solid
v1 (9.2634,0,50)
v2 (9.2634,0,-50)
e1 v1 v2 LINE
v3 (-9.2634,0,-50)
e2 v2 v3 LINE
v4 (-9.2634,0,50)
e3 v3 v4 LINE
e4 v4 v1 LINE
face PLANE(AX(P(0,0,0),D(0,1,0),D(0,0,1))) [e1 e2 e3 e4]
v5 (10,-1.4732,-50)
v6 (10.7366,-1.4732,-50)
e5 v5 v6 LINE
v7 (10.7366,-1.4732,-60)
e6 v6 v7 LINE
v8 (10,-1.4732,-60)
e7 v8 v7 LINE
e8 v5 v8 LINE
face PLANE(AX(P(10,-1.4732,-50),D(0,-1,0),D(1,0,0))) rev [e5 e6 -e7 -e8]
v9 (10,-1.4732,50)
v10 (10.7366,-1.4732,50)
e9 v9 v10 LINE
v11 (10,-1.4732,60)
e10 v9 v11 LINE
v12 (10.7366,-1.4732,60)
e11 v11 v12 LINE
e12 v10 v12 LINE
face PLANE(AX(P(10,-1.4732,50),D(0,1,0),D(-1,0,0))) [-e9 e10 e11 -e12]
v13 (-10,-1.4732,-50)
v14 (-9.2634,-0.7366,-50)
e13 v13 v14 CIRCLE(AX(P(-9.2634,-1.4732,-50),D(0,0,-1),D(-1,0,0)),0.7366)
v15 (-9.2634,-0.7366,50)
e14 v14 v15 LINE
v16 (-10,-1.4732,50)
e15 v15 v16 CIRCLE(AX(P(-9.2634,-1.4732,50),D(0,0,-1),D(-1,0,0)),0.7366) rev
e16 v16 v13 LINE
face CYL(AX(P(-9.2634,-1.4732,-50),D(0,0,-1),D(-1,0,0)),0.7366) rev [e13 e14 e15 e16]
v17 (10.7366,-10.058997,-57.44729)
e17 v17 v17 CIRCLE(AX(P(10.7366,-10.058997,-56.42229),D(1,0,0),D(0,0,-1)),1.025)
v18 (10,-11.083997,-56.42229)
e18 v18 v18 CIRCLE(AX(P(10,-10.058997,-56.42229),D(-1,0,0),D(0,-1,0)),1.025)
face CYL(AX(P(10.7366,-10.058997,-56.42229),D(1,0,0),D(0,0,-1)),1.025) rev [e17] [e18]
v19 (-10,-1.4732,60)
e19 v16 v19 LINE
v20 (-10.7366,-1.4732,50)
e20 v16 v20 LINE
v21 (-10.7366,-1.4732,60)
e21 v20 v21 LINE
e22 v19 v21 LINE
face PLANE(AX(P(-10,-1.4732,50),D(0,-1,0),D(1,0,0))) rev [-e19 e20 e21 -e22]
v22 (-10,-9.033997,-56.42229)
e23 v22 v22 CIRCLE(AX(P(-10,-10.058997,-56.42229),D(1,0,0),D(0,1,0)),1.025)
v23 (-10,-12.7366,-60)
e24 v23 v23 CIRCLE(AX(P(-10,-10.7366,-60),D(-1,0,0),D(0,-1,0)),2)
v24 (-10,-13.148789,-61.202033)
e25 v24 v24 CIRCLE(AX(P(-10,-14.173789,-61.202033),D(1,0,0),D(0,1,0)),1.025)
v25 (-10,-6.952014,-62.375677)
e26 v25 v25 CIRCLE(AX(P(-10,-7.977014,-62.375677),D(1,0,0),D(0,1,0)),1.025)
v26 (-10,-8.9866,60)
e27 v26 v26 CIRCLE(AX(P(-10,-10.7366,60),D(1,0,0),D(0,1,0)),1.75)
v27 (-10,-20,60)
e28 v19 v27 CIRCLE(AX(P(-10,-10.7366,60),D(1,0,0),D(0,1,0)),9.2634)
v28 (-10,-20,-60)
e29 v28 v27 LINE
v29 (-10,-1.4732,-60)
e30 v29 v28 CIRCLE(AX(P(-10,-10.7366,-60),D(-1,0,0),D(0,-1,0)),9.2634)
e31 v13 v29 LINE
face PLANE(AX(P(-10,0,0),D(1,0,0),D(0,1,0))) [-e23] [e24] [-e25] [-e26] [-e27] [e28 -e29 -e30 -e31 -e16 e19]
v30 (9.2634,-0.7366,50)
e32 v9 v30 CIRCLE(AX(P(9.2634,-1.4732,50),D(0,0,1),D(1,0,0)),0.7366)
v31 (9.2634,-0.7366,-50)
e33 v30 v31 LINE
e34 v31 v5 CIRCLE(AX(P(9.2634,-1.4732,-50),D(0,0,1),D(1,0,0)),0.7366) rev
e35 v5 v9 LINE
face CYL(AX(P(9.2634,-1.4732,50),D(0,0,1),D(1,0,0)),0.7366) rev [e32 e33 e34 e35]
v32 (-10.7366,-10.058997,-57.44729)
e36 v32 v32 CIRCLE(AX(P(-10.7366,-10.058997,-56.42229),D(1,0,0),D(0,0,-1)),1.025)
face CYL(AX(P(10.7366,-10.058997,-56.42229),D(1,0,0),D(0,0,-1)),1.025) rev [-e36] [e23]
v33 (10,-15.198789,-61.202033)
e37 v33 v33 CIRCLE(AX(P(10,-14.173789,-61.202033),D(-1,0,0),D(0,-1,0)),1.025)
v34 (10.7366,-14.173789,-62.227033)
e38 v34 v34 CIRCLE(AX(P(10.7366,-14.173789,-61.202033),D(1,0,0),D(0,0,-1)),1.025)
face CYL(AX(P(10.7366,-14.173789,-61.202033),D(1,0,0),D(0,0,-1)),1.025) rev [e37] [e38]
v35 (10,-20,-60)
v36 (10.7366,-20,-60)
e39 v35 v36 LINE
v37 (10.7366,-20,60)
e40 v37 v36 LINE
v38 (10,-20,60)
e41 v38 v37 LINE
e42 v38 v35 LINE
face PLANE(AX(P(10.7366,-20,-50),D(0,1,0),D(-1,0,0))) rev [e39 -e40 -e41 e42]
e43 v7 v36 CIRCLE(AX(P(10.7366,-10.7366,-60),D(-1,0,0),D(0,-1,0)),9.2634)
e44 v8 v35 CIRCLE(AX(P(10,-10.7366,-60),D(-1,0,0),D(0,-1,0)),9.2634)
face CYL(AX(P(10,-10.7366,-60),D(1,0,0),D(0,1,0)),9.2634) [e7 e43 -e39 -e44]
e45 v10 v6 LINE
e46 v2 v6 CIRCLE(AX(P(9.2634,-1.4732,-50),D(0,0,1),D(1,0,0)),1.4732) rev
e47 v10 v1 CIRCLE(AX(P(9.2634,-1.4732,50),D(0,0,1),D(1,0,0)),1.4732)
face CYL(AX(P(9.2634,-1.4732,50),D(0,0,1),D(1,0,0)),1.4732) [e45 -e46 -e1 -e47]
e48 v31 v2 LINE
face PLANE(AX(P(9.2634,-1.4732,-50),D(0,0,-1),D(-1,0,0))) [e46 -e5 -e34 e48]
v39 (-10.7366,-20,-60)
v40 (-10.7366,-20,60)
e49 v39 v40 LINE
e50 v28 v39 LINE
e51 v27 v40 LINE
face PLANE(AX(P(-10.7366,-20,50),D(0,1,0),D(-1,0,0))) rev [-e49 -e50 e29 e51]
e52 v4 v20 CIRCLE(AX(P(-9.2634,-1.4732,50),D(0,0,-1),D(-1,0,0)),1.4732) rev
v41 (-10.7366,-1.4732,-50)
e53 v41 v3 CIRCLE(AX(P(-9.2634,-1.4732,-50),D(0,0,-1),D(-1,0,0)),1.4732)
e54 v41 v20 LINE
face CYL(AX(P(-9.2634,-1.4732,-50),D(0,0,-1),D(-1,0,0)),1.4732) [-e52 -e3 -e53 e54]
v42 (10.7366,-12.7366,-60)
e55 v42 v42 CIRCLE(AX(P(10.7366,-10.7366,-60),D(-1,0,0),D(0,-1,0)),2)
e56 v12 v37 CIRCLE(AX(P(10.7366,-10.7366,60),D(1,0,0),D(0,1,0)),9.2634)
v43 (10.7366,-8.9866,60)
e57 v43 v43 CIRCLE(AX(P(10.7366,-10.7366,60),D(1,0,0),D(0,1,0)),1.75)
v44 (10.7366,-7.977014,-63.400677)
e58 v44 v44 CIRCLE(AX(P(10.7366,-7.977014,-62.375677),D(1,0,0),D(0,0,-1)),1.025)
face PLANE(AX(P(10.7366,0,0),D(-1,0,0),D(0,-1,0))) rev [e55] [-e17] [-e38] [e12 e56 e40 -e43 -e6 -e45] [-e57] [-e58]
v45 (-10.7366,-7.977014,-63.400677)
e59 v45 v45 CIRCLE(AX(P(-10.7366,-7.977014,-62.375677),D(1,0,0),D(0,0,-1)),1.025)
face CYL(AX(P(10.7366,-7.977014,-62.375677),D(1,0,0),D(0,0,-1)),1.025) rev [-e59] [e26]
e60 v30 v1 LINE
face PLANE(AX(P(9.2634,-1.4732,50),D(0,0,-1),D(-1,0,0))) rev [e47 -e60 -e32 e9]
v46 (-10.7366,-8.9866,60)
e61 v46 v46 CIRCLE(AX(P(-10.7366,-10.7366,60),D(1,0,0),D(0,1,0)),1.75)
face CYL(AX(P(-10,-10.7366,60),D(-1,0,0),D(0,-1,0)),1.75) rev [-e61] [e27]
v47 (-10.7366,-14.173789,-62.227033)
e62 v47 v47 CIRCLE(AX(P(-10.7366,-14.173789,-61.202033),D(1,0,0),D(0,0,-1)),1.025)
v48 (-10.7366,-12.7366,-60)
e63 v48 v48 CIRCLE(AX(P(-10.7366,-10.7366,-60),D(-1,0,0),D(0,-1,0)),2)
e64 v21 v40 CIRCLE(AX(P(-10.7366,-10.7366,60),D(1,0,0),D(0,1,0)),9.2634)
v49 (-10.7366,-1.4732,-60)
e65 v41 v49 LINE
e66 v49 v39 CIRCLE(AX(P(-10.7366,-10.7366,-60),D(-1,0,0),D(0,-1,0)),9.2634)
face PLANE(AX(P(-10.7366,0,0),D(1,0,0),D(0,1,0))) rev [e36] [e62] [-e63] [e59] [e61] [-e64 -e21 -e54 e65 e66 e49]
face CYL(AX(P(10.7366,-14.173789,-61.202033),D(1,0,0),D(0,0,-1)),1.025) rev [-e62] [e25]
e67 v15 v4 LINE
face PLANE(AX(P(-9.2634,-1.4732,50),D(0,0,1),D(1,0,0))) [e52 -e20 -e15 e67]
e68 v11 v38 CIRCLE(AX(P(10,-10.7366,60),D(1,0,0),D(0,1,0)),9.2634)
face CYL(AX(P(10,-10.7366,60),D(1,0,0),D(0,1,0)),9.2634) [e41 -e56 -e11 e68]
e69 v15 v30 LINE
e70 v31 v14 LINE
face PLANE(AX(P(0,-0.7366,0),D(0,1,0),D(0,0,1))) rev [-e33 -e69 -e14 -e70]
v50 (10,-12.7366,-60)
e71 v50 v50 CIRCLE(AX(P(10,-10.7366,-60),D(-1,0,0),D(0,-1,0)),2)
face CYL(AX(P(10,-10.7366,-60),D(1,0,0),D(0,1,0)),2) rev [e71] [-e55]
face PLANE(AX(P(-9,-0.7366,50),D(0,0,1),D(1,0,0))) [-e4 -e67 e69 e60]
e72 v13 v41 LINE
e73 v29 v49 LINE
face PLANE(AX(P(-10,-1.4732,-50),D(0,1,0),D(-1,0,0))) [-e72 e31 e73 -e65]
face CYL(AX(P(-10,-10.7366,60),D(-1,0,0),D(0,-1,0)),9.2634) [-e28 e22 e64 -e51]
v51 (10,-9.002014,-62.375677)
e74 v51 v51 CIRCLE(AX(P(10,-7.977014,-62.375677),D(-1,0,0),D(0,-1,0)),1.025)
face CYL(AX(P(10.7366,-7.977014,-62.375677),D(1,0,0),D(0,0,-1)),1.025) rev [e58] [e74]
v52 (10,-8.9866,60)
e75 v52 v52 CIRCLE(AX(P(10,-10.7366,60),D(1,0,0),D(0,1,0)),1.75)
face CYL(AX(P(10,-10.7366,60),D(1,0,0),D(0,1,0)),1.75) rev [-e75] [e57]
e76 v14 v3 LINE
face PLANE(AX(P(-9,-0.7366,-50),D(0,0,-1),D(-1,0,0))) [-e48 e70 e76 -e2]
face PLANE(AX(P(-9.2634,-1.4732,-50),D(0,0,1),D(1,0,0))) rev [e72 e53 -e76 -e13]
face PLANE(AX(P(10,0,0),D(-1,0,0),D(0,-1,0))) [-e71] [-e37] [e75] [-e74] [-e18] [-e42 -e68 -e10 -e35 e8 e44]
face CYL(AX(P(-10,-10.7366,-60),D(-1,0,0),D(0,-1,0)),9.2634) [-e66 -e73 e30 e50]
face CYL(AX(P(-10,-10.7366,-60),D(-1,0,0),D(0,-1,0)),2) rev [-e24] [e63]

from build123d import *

# Parameters (mm, degrees)
SKETCH1_W                    = 18
SKETCH1_H                    = 100
BASE_FLANGE1_DEPTH           = 0.7366
EDGE_FLANGE1_DEPTH           = 100
EDGE_FLANGE1_BEND_DEPTH      = 100
SKETCH12_R                   = 2
TAB1_DEPTH                   = 0.7366
SKETCH15_R                   = 1.75
TAB2_DEPTH                   = 0.7366
F_2_05_2_05_DIAMETER_HOLE1_D = 2.05


# Sheet-metal steps are written as plain solids
with BuildPart() as part:
    # Sketch1 → Base-Flange1 (new body)
    with BuildSketch(Plane(origin=(0, 0, 0), x_dir=(1, 0, 0), z_dir=(0, 1, 0))):
        Rectangle(SKETCH1_W, SKETCH1_H)
    extrude(amount=-BASE_FLANGE1_DEPTH)

    # Edge-Flange1 section (across the edge) → Edge-Flange1 (add)
    with BuildSketch(Plane(origin=(10, -0.7366, -50), x_dir=(-1, 0, 0), z_dir=(0, 0, 1))):
        with BuildLine():
            Line((-0.7366, 0.7366), (-0.7366, 19.2634))
            Line((-0.7366, 19.2634), (0, 19.2634))
            Line((0, 19.2634), (0, 0.7366))
            ThreePointArc((0, 0.7366), (0.215745145, 0.215745145), (0.7366, 0))
            Line((0.7366, 0), (1, 0))
            Line((1, 0), (1, -0.7366))
            Line((1, -0.7366), (0.7366, -0.7366))
            ThreePointArc((0.7366, -0.7366), (-0.30510971, -0.30510971), (-0.7366, 0.7366))
        make_face()
    extrude(amount=EDGE_FLANGE1_DEPTH)

    # Edge-Flange1 section 2 (across the edge) → Edge-Flange1 bend (add)
    with BuildSketch(Plane(origin=(-10, -0.7366, 50), x_dir=(1, 0, 0), z_dir=(0, 0, -1))):
        with BuildLine():
            Line((-0.7366, 0.7366), (-0.7366, 19.2634))
            Line((-0.7366, 19.2634), (0, 19.2634))
            Line((0, 19.2634), (0, 0.7366))
            ThreePointArc((0, 0.7366), (0.215745145, 0.215745145), (0.7366, 0))
            Line((0.7366, 0), (1, 0))
            Line((1, 0), (1, -0.7366))
            Line((1, -0.7366), (0.7366, -0.7366))
            ThreePointArc((0.7366, -0.7366), (-0.30510971, -0.30510971), (-0.7366, 0.7366))
        make_face()
    extrude(amount=EDGE_FLANGE1_BEND_DEPTH)

    # Sketch12 → Tab1 (add)
    with BuildSketch(Plane.ZY.offset(10.7366)):
        with BuildLine():
            Line((-50, -1.4732), (-50, -20))
            Line((-50, -20), (-60, -20))
            ThreePointArc((-60, -20), (-69.2634, -10.7366), (-60, -1.4732))
            Line((-60, -1.4732), (-50, -1.4732))
        make_face()
        with Locations(Location((-60, -10.7366, 0), (0, 0, 270))):
            Circle(SKETCH12_R, mode=Mode.SUBTRACT)
    tab1 = extrude(amount=-TAB1_DEPTH)

    # Mirror1: Tab1 across plane
    add(tab1.mirror(Plane(origin=(0, 0, 0), x_dir=(0, 0, 1), z_dir=(1, 0, 0))))

    # Sketch15 → Tab2 (add)
    with BuildSketch(Plane(origin=(10.7366, 0, 0), x_dir=(0, 0, -1), z_dir=(1, 0, 0))):
        with BuildLine():
            Line((-50, -20), (-50, -1.4732))
            Line((-50, -1.4732), (-60, -1.4732))
            ThreePointArc((-60, -1.4732), (-69.2634, -10.7366), (-60, -20))
            Line((-60, -20), (-50, -20))
        make_face()
        with Locations(Location((-60, -10.7366, 0), (0, 0, 90))):
            Circle(SKETCH15_R, mode=Mode.SUBTRACT)
    tab2 = extrude(amount=-TAB2_DEPTH)

    # Mirror4: Tab2 across plane
    add(tab2.mirror(Plane(origin=(0, 0, 0), x_dir=(0, 0, 1), z_dir=(1, 0, 0))))

    # Ø2.05 (2.05) Diameter Hole1 (through all)
    with Locations(Plane(origin=(10.7366, -177.313180916, -73.74616676), x_dir=(0, 0.24782925197186137, -0.9688037272157182), z_dir=(1, 0, 0))):
        with Locations((24.667042937, 166.329840483), (30.950682453, 166.871449852), (28.277910167, 161.158853719)):
            Hole(F_2_05_2_05_DIAMETER_HOLE1_D / 2)


solid = part.part
